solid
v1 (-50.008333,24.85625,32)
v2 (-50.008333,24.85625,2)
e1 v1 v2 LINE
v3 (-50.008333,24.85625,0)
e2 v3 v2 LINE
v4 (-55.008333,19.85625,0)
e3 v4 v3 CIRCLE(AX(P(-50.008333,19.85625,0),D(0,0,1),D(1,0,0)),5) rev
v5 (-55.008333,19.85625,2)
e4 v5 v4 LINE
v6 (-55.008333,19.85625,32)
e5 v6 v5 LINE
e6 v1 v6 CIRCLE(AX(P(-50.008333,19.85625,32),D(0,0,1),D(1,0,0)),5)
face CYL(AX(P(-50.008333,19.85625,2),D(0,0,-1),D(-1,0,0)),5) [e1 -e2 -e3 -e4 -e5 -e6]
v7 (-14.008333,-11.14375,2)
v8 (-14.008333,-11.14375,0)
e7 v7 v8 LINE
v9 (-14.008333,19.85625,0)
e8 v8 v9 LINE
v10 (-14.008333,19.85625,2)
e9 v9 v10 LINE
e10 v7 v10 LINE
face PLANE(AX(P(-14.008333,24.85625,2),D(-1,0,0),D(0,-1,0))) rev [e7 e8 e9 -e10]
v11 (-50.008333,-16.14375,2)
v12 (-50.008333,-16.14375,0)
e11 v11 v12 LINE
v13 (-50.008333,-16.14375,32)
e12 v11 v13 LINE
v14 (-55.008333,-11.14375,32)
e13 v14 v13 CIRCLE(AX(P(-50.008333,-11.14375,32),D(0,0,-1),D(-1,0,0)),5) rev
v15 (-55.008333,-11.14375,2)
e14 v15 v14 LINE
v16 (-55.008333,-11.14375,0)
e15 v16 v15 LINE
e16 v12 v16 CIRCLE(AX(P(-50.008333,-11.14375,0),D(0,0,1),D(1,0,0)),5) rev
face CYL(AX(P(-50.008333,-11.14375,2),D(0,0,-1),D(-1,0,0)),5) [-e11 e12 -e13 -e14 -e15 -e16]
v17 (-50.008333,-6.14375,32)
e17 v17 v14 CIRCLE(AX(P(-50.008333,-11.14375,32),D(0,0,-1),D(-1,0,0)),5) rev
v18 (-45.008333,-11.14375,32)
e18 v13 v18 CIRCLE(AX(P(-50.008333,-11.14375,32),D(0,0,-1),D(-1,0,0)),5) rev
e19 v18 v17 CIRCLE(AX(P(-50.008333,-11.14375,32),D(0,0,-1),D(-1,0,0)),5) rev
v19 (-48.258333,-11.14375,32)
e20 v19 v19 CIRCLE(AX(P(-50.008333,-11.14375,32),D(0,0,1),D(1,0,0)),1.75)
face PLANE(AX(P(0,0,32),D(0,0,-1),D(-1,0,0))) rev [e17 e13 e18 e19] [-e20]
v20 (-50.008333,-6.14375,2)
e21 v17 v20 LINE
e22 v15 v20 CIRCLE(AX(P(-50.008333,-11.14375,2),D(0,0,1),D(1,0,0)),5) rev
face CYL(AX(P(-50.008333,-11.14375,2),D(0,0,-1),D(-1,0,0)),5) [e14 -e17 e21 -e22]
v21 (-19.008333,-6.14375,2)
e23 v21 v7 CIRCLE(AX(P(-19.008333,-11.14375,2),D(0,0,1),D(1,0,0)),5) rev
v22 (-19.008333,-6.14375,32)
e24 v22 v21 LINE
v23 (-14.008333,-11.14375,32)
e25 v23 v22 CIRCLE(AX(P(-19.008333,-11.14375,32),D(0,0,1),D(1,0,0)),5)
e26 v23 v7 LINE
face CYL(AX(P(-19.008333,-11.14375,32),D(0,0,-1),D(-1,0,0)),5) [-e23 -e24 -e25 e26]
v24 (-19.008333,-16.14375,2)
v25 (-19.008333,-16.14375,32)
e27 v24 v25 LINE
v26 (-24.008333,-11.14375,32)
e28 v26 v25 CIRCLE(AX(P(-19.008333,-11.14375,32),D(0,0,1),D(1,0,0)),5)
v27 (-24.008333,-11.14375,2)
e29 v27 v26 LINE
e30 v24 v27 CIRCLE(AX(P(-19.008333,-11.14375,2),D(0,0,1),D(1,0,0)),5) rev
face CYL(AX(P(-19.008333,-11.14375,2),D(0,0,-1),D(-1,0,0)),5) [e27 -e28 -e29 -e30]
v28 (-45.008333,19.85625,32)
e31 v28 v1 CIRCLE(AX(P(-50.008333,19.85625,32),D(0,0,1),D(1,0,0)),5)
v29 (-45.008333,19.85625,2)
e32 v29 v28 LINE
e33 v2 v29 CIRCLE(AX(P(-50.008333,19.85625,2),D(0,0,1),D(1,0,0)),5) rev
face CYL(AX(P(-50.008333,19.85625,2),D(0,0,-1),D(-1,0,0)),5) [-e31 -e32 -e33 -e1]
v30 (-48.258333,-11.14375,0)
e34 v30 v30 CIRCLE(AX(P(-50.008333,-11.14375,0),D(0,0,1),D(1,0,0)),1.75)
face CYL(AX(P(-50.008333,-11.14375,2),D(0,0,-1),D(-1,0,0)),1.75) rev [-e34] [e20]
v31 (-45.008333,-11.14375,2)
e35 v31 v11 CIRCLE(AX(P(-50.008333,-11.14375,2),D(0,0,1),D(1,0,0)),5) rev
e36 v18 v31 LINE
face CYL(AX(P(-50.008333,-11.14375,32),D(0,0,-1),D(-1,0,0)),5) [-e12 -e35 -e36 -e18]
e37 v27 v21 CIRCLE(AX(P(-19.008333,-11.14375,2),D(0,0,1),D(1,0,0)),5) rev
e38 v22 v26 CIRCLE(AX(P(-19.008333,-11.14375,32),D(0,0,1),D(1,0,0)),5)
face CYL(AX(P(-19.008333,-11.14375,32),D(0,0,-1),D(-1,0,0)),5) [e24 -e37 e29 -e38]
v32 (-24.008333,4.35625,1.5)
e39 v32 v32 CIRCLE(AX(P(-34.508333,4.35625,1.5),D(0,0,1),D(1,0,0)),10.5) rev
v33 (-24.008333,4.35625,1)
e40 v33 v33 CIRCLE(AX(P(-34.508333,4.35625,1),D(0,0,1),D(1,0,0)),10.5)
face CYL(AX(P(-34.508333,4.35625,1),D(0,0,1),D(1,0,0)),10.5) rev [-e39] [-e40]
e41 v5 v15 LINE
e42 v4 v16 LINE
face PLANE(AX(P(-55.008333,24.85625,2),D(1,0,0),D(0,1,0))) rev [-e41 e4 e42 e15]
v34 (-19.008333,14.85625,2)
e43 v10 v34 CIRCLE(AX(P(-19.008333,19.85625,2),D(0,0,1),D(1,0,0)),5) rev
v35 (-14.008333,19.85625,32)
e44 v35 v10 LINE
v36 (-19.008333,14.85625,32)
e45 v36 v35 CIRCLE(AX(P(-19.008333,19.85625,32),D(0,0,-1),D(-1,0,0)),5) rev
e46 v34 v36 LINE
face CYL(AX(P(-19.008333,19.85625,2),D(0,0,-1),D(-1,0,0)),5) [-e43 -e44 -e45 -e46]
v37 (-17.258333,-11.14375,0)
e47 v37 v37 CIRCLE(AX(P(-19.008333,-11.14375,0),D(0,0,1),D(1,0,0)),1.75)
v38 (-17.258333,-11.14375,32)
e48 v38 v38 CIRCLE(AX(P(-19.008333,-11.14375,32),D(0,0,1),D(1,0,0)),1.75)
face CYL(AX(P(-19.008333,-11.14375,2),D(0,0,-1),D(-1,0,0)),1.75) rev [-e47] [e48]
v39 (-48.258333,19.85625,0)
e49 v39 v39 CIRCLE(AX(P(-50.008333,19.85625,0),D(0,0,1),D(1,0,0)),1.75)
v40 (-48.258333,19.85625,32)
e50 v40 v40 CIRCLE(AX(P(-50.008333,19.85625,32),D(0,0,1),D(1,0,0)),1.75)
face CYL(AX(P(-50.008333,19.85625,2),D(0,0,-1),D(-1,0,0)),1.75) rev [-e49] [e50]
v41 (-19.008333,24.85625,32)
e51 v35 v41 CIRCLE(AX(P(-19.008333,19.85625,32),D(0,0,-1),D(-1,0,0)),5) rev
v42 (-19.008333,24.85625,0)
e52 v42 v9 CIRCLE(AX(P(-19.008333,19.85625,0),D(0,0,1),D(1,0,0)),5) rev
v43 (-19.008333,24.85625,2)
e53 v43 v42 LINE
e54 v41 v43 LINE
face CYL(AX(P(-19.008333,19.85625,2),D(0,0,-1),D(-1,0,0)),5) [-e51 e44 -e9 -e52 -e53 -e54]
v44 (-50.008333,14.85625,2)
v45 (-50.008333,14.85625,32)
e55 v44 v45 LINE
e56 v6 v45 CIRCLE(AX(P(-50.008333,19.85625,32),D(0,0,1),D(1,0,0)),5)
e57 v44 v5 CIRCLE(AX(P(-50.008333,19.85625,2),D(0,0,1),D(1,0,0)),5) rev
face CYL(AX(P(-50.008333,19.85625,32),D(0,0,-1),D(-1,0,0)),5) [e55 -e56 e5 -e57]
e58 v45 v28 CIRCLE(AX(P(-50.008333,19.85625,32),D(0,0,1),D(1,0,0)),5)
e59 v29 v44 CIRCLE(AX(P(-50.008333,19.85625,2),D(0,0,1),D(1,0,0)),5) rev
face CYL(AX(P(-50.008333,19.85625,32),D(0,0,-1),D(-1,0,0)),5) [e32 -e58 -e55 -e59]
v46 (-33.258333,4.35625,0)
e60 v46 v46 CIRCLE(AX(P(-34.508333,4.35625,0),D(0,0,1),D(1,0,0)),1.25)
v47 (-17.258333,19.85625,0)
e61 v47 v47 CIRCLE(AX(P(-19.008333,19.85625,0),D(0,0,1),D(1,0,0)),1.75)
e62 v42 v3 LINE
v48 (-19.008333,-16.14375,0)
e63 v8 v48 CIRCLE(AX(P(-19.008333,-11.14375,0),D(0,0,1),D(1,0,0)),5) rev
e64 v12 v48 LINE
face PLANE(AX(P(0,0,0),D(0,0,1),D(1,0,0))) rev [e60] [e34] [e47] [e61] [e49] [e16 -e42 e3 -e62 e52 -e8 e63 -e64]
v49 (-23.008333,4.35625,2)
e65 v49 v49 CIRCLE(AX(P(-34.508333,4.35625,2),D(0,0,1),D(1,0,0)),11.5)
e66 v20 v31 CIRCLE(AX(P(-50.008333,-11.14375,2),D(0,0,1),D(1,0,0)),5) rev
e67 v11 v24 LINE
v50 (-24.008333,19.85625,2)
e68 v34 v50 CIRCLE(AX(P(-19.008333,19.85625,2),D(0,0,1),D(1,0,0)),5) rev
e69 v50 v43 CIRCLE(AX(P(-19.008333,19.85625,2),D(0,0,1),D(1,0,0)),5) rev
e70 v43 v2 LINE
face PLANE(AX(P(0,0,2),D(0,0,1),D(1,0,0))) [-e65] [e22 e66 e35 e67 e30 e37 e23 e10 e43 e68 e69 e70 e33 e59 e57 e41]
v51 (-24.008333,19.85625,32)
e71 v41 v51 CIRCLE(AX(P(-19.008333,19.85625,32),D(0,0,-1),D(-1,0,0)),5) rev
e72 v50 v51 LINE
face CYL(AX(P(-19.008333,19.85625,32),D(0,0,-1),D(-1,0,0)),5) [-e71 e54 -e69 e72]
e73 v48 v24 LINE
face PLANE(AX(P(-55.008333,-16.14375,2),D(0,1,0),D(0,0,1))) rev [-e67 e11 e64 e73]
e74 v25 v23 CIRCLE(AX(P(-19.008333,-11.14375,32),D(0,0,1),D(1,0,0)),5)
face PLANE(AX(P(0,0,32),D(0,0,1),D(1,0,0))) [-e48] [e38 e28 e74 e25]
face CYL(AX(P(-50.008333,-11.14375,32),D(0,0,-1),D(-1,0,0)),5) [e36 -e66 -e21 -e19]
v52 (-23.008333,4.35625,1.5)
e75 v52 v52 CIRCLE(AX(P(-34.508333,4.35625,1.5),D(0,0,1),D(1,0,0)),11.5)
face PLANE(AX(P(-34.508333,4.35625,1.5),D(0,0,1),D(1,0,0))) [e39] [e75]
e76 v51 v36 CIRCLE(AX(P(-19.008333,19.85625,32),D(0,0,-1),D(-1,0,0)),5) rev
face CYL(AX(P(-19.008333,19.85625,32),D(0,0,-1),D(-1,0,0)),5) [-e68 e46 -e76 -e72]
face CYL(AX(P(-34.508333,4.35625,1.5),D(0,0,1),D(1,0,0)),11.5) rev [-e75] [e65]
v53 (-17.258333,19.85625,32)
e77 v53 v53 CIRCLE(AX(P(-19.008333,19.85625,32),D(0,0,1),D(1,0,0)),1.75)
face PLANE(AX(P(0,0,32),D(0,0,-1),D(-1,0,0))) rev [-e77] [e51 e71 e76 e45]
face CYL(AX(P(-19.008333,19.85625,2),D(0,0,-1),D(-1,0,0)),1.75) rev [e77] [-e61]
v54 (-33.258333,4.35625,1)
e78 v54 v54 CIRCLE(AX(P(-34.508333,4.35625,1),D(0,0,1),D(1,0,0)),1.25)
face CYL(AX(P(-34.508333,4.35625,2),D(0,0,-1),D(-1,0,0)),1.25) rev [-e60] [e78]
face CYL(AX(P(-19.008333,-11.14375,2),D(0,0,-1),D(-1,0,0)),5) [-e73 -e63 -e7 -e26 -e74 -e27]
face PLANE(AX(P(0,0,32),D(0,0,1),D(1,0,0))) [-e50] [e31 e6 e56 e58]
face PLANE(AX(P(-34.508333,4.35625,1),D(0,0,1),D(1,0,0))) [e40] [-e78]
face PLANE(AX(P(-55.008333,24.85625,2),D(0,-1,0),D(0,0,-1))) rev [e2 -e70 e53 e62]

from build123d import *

# Parameters (mm, degrees)
SKETCH1_W           = 41
SKETCH1_H           = 41
SKETCH1_R           = 1.75
SKETCH1_R_2         = 1.25
BOSS_EXTRUDE1_DEPTH = 2
SKETCH2_W           = 10
SKETCH2_H           = 10
SKETCH2_R           = 1.75
BOSS_EXTRUDE2_DEPTH = 30
FILLET1_R           = 5
SKETCH3_R           = 10.5
CUT_EXTRUDE1_DEPTH  = 1
SKETCH4_R           = 11.5
CUT_EXTRUDE2_DEPTH  = 0.5


with BuildPart() as part:
    # Sketch1 → Boss-Extrude1 (new body)
    with BuildSketch(Plane.XY):
        with Locations((-34.508333333, 4.35625)):
            Rectangle(SKETCH1_W, SKETCH1_H)
        with Locations((-50.008333333, 19.85625)):
            Circle(SKETCH1_R, mode=Mode.SUBTRACT)
        with Locations((-50.008333333, -11.14375)):
            Circle(SKETCH1_R, mode=Mode.SUBTRACT)
        with Locations((-19.008333333, -11.14375)):
            Circle(SKETCH1_R, mode=Mode.SUBTRACT)
        with Locations((-19.008333333, 19.85625)):
            Circle(SKETCH1_R, mode=Mode.SUBTRACT)
        with Locations((-34.508333333, 4.35625)):
            Circle(SKETCH1_R_2, mode=Mode.SUBTRACT)
    extrude(amount=BOSS_EXTRUDE1_DEPTH)

    # Sketch2 → Boss-Extrude2 (add)
    # profile 1 of 4: a face of its own
    with BuildSketch(Plane.XY.offset(2)):
        with Locations((-50.008333333, 19.85625)):
            Rectangle(SKETCH2_W, SKETCH2_H)
        with Locations((-50.008333333, 19.85625)):
            Circle(SKETCH2_R, mode=Mode.SUBTRACT)
    # profile 2 of 4: a face of its own
    with BuildSketch(Plane.XY.offset(2)):
        with Locations((-50.008333333, -11.14375)):
            Rectangle(SKETCH2_W, SKETCH2_H)
        with Locations((-50.008333333, -11.14375)):
            Circle(SKETCH2_R, mode=Mode.SUBTRACT)
    # profile 3 of 4: a face of its own
    with BuildSketch(Plane.XY.offset(2)):
        with Locations((-19.008333333, -11.14375)):
            Rectangle(SKETCH2_W, SKETCH2_H)
        with Locations((-19.008333333, -11.14375)):
            Circle(SKETCH2_R, mode=Mode.SUBTRACT)
    # profile 4 of 4: a face of its own
    with BuildSketch(Plane.XY.offset(2)):
        with Locations((-19.008333333, 19.85625)):
            Rectangle(SKETCH2_W, SKETCH2_H)
        with Locations((-19.008333333, 19.85625)):
            Circle(SKETCH2_R, mode=Mode.SUBTRACT)
    extrude(amount=BOSS_EXTRUDE2_DEPTH)

    # Fillet1
    fillet1_edges = [part.edges().sort_by_distance(p)[0] for p in [
        (-24.008333333, 24.85625, 17),
        (-24.008333333, -6.14375, 17),
        (-55.008333333, -6.14375, 17),
        (-55.008333333, 14.85625, 17),
        (-45.008333333, 24.85625, 17),
        (-45.008333333, -6.14375, 17),
        (-45.008333333, -16.14375, 17),
        (-24.008333333, -16.14375, 17),
        (-14.008333333, -6.14375, 17),
        (-14.008333333, 14.85625, 17),
        (-24.008333333, 14.85625, 17),
        (-45.008333333, 14.85625, 17),
        (-14.008333333, -16.14375, 16),
        (-14.008333333, 24.85625, 16),
        (-55.008333333, -16.14375, 16),
        (-55.008333333, 24.85625, 16),
    ]]
    fillet(fillet1_edges, radius=FILLET1_R - 0.0001)  # a hair under: the kernel refuses the full size

    # Sketch3 → Cut-Extrude1 (cut)
    with BuildSketch(Plane.XY.offset(2)):
        with Locations((-34.508333333, 4.35625)):
            Circle(SKETCH3_R)
    extrude(amount=-CUT_EXTRUDE1_DEPTH, mode=Mode.SUBTRACT)

    # Sketch4 → Cut-Extrude2 (cut)
    with BuildSketch(Plane.XY.offset(2)):
        with Locations((-34.508333333, 4.35625)):
            Circle(SKETCH4_R)
    extrude(amount=-CUT_EXTRUDE2_DEPTH, mode=Mode.SUBTRACT)


solid = part.part
